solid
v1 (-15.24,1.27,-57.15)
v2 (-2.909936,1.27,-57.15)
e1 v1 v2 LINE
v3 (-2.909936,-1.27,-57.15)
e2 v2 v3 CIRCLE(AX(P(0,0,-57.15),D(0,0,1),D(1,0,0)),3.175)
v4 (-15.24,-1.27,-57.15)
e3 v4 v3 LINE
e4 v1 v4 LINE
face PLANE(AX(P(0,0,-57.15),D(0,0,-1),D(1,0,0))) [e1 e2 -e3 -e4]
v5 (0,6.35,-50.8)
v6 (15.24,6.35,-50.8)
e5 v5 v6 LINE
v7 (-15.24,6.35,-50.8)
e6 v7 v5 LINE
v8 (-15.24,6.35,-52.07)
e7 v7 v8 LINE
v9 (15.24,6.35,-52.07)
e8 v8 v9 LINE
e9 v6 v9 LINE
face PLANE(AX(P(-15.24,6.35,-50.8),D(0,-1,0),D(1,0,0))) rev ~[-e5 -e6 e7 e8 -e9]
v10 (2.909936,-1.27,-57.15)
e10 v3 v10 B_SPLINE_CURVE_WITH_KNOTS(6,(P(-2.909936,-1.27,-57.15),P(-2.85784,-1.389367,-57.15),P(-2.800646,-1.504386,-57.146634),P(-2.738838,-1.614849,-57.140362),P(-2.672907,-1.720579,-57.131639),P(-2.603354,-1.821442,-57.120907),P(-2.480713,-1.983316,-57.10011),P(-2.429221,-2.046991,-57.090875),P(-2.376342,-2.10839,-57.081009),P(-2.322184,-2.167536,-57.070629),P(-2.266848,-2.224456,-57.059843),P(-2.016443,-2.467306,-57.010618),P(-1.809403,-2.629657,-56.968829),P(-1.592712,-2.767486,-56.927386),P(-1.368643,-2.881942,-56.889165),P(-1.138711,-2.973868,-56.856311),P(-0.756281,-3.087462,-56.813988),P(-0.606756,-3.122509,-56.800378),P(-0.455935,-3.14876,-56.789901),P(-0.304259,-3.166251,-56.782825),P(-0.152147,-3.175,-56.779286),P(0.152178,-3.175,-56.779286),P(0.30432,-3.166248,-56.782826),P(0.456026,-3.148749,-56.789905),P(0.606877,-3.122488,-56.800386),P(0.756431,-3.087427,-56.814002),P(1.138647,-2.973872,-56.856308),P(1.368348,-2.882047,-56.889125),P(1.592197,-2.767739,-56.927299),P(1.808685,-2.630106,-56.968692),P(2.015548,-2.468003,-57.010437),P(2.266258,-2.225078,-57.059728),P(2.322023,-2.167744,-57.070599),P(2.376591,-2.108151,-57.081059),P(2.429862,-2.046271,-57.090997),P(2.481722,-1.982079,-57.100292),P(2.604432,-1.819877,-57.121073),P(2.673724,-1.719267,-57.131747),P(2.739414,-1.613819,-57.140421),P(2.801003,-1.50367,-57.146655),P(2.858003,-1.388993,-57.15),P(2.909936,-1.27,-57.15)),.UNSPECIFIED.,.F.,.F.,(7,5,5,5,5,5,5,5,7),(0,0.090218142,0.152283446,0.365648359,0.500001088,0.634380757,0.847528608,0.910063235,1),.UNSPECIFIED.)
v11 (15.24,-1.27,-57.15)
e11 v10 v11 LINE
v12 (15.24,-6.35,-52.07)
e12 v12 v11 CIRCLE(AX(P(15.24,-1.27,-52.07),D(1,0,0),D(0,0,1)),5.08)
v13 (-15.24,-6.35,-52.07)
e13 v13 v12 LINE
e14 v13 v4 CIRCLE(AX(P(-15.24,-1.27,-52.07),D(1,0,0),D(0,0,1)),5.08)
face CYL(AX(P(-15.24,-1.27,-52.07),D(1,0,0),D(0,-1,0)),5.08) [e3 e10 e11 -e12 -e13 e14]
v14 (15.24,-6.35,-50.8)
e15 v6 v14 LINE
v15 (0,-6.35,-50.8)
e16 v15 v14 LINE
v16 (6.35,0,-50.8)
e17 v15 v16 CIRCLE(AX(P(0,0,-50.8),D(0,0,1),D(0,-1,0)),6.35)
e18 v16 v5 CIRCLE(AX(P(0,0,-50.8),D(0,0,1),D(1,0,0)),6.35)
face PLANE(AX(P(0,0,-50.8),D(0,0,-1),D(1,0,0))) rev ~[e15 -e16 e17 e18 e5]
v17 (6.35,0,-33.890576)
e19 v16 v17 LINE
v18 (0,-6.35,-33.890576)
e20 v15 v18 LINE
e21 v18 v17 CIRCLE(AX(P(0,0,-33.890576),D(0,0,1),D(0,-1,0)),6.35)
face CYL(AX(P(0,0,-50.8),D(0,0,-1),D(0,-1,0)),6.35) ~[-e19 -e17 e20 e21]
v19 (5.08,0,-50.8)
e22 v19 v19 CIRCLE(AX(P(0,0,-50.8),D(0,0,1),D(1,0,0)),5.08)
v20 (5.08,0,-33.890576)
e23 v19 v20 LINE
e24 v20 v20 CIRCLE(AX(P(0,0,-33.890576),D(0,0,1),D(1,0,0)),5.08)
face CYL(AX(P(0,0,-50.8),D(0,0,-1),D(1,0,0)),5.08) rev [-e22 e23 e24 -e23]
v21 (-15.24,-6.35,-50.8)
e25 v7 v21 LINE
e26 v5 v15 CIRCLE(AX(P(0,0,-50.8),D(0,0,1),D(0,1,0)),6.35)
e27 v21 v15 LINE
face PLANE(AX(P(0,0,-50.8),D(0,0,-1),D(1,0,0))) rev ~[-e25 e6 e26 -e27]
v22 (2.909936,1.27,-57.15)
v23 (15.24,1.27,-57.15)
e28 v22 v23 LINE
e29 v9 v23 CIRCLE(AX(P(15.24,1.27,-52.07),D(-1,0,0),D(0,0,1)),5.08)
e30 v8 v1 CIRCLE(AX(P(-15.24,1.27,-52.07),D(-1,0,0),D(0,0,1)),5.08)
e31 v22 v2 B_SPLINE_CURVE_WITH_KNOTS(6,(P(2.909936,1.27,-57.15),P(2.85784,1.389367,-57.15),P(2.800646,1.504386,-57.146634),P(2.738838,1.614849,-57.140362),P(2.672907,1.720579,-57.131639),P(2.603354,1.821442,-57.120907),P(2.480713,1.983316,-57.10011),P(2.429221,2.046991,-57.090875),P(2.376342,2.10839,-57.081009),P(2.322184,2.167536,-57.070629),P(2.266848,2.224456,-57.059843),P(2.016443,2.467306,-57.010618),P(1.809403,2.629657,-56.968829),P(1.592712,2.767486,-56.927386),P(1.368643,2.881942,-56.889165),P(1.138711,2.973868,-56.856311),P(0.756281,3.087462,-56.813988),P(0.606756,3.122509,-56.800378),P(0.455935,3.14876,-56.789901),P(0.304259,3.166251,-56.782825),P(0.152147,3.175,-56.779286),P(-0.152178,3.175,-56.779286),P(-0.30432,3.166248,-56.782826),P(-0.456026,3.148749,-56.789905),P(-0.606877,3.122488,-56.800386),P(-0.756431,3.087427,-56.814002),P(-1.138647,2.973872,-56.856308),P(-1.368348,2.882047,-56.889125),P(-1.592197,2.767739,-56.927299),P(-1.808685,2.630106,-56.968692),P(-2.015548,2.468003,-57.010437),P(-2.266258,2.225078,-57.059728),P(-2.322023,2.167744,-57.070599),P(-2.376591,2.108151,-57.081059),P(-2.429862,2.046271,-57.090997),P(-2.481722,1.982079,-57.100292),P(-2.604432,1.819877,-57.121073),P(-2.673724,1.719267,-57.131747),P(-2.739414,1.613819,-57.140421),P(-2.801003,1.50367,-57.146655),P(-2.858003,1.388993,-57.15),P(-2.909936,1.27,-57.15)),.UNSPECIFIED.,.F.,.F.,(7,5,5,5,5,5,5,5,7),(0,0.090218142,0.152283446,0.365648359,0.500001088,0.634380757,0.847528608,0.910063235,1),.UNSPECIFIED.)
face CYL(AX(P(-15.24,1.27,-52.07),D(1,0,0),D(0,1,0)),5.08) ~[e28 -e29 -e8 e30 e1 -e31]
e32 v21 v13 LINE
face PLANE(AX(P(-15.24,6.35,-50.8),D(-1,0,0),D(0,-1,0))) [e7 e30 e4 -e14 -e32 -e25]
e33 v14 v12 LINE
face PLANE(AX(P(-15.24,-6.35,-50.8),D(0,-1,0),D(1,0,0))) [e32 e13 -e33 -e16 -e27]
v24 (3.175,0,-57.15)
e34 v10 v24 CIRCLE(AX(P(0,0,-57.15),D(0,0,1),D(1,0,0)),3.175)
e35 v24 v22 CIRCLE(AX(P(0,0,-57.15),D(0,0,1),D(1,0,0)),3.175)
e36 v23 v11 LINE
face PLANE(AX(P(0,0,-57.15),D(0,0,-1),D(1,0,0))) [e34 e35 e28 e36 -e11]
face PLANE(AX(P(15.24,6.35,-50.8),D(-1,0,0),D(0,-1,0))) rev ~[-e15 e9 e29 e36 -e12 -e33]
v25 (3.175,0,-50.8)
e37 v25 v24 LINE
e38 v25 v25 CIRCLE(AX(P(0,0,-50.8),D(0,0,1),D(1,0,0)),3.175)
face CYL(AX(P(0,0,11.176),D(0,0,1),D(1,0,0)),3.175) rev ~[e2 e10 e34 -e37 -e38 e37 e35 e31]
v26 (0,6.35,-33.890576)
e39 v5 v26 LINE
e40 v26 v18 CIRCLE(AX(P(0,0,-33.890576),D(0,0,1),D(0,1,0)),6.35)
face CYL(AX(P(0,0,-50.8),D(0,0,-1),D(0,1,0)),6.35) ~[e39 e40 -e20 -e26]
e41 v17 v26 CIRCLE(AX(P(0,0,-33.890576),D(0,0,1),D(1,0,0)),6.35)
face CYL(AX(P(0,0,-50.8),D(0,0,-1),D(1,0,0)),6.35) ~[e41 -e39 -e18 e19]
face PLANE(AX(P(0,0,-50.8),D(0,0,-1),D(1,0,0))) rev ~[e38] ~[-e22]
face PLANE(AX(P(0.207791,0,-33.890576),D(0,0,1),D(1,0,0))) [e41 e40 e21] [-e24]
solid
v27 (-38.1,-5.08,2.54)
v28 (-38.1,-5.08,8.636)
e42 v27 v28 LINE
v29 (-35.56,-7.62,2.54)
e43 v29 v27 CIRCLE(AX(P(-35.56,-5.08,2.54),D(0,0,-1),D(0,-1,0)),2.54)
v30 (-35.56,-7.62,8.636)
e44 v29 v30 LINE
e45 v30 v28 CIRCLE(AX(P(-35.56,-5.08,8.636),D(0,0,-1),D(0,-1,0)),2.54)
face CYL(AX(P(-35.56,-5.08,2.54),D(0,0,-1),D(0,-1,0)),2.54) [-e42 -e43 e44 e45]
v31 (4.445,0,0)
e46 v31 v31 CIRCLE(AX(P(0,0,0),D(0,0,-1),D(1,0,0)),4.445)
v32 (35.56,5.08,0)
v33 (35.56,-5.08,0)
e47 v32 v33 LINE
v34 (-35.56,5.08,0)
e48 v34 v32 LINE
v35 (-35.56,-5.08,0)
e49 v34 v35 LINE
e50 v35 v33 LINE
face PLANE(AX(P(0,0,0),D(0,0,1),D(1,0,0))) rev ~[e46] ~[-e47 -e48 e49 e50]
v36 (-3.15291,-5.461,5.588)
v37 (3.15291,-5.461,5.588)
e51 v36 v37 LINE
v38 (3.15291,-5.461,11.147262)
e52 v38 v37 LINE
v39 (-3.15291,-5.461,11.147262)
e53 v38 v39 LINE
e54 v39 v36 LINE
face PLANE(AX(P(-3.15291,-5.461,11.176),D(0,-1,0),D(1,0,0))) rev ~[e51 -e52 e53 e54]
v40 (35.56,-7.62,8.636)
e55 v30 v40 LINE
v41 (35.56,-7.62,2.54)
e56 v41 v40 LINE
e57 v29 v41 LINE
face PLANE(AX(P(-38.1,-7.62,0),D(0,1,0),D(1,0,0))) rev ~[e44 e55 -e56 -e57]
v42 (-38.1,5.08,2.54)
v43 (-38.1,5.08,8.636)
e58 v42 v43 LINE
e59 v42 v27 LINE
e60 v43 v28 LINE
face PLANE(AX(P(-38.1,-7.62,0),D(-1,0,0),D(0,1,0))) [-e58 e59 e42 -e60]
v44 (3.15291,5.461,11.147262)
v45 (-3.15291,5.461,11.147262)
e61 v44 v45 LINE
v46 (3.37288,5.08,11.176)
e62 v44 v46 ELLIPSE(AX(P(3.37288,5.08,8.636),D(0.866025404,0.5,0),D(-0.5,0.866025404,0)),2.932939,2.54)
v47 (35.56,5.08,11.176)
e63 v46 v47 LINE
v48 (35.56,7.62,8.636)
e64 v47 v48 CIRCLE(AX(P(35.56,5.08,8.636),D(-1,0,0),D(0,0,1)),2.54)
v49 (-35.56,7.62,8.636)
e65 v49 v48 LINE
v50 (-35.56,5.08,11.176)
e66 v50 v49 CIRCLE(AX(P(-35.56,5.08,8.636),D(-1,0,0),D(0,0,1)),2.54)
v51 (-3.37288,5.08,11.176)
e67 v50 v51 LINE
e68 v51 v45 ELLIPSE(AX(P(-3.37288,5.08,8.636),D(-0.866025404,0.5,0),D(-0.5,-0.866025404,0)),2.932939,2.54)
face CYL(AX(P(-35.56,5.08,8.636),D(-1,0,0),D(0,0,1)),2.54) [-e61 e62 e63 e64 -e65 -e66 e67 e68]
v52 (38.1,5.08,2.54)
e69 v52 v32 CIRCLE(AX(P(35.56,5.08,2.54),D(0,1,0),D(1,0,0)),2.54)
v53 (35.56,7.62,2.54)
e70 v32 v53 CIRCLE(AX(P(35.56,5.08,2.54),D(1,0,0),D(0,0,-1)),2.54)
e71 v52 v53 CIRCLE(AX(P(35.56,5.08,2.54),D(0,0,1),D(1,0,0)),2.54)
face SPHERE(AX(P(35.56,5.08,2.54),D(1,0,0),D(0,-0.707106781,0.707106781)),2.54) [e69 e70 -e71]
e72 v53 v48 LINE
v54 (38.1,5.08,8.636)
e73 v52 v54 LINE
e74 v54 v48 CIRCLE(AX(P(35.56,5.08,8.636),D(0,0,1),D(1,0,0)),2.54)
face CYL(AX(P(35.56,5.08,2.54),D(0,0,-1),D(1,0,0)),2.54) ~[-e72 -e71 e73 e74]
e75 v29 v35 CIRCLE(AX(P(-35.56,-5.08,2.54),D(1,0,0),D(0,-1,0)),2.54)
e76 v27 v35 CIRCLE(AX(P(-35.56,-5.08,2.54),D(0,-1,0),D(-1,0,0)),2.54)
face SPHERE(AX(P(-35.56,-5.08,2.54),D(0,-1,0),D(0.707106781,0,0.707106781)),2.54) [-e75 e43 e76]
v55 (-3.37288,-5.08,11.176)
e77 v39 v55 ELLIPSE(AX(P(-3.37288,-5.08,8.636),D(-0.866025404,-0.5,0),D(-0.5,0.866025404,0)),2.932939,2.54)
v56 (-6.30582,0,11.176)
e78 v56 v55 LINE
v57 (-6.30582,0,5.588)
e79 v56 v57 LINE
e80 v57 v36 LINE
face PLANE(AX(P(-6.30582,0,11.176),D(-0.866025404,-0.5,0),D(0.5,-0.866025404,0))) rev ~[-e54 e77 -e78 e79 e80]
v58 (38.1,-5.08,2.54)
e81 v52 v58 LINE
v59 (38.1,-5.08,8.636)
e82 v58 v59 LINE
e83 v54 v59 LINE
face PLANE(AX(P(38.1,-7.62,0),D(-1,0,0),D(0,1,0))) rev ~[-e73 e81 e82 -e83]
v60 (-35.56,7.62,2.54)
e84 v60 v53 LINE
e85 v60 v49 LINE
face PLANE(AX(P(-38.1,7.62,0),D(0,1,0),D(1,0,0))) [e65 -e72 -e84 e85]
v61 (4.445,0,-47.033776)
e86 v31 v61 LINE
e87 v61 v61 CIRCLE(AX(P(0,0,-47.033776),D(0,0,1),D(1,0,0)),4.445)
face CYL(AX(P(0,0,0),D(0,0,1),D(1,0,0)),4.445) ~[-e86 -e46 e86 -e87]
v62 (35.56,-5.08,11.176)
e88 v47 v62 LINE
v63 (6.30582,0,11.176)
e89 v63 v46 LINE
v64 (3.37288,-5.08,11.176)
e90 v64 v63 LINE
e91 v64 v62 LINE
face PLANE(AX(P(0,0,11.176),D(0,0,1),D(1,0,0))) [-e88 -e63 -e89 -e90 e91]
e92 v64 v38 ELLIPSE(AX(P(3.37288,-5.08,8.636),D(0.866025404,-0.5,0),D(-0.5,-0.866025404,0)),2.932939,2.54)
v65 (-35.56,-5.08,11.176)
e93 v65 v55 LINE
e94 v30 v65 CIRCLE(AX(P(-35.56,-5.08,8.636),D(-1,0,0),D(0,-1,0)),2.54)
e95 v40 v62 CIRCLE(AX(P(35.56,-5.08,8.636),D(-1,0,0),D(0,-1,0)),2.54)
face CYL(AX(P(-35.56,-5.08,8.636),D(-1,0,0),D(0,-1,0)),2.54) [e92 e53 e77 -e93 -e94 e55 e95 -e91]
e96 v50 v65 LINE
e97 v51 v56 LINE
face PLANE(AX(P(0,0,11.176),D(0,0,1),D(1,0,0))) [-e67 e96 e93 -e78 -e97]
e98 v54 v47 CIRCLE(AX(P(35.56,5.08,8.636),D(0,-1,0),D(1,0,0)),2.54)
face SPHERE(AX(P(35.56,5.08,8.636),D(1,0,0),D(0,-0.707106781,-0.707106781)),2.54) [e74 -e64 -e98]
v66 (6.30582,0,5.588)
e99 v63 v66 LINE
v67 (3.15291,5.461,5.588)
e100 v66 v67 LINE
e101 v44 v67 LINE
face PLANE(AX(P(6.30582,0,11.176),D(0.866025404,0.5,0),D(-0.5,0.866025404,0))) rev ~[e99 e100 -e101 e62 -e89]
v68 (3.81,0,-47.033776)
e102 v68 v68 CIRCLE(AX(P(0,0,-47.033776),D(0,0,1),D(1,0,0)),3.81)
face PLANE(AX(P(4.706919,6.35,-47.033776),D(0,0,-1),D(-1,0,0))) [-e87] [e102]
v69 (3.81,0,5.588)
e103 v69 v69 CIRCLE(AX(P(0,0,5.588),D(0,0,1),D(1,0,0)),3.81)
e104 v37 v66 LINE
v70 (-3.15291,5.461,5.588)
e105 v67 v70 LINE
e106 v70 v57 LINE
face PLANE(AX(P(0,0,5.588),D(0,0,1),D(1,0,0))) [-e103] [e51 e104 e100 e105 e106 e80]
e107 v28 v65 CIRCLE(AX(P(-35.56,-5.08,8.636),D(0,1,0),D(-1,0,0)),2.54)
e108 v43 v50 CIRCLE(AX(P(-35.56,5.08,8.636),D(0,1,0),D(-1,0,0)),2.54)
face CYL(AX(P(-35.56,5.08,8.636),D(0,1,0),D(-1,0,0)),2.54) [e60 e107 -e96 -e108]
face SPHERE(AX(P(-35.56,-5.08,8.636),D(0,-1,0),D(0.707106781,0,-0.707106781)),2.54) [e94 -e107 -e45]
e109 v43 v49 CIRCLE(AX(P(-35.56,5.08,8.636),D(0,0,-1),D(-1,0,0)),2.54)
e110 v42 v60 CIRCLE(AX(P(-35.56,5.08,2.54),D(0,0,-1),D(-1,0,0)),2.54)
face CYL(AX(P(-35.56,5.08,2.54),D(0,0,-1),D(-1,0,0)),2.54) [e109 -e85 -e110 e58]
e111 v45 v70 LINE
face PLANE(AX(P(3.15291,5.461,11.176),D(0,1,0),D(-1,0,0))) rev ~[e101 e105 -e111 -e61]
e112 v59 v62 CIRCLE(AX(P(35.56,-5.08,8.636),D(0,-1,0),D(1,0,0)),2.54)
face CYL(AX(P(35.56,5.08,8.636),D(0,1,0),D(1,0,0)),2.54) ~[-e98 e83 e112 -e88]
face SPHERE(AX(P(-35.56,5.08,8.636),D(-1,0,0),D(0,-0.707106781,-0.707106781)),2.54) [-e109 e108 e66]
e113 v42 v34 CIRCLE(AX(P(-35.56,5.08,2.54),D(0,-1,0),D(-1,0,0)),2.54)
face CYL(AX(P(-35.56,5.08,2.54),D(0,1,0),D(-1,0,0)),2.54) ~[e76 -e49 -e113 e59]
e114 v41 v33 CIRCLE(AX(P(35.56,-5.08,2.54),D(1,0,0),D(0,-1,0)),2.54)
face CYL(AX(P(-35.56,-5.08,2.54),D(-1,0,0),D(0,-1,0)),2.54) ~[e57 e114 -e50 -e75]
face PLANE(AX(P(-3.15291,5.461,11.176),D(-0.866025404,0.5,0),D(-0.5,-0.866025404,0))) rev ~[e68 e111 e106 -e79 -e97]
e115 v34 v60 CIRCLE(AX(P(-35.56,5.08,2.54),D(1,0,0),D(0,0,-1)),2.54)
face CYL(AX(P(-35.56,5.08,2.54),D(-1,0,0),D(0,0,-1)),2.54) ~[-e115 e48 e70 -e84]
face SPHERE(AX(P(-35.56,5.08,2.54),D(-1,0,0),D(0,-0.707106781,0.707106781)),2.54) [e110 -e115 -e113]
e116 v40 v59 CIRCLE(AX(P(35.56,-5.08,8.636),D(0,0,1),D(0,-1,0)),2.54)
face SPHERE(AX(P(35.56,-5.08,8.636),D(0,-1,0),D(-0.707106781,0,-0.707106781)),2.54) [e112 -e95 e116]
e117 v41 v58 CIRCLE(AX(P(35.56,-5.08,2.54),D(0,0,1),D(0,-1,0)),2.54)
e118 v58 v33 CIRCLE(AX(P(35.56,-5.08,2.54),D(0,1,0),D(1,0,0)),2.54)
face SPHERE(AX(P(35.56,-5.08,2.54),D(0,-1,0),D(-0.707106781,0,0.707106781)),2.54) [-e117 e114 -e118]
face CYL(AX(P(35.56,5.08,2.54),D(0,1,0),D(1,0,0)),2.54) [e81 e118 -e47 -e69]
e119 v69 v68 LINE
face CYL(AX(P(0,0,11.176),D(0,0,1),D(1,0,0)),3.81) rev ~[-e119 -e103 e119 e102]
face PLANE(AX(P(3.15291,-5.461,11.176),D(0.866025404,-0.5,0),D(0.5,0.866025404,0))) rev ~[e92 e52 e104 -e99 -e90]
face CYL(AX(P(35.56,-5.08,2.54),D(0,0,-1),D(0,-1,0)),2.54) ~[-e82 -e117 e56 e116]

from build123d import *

# Parameters (mm, degrees)
F0_W         = 76.2
F0_H         = 15.24
F1_DEPTH     = 11.176
F4_DEPTH     = 5.588
F5_R         = 3.175
F6_DEPTH     = 11.176
F7_T1_DEPTH  = 6.096
F7_T3_DEPTH  = 10.16
F7_T5_DEPTH  = 71.12
F7_S9_W      = 2.54
F7_S9_H      = 2.54
F7_T10_DEPTH = 2.54
F7_S15_W     = 2.54
F7_S15_H     = 2.54
F7_T16_DEPTH = 2.54
F7_S21_W     = 2.54
F7_S21_H     = 2.54
F7_T22_DEPTH = 2.54
F7_S27_W     = 2.54
F7_S27_H     = 2.54
F7_T28_DEPTH = 2.54
F7_S33_W     = 2.54
F7_S33_H     = 2.54
F7_T34_DEPTH = 2.54
F7_S39_W     = 2.54
F7_S39_H     = 2.54
F7_T40_DEPTH = 2.54
F7_S45_W     = 2.54
F7_S45_H     = 2.54
F7_T46_DEPTH = 2.54
F7_S51_W     = 2.54
F7_S51_H     = 2.54
F7_T52_DEPTH = 2.54
F8_R         = 4.445
F9_DEPTH     = 50.8
F10_R        = 3.175
F11_DEPTH    = 61.976
F12_W        = 30.48
F12_H        = 12.7
F13_DEPTH    = 6.35
F14_R        = 5.08
F15_R        = 3.175
F16_DEPTH    = 71.6058239341
F17_W        = 9.715013206
F17_H        = 3.7662244022
F18_DEPTH    = 16.9285498559
F20_R        = 5.08
F21_DEPTH    = 16.9094242156
F22_R        = 3.81
F23_DEPTH    = 111.593618989


# Not quite as in the source:
# - a fillet or chamfer that OpenCascade refuses, or shapes differently, is made with other operations: its cross-section is extruded or revolved along the edge and cut away or added


with BuildPart() as f1:
    # F0 (on Top) → F1 (new body)
    with BuildSketch(Plane.XY):
        Rectangle(F0_W, F0_H)
    extrude(amount=F1_DEPTH)

    # F3 (on face) → F4 (cut)
    with BuildSketch(Plane.XY.offset(11.176)):
        Polygon((-3.15290982, -5.461), (3.15290982, -5.461), (6.3058196401, 0), (3.15290982, 5.461), (-3.15290982, 5.461), (-6.3058196401, 0), align=None)
    extrude(amount=-F4_DEPTH, mode=Mode.SUBTRACT)

    # F5 (on face) → F6 (cut)
    with BuildSketch(Plane.XY.offset(11.176)):
        Circle(F5_R)
    extrude(amount=-F6_DEPTH, mode=Mode.SUBTRACT)

    # F7: fillet of radius 2.54 on 12 edges, made by hand

    # F7_s2 → F7_t1 (cut)
    with BuildSketch(Plane.XY.offset(2.54)):
        with BuildLine():
            ThreePointArc((-35.56, -7.62), (-37.3560512242, -6.8760512242), (-38.1, -5.08))
            Line((-38.1, -5.08), (-38.1, -7.62))
            Line((-38.1, -7.62), (-35.56, -7.62))
        make_face()
        with BuildLine():
            ThreePointArc((-38.1, 5.08), (-37.3560512242, 6.8760512242), (-35.56, 7.62))
            Line((-35.56, 7.62), (-38.1, 7.62))
            Line((-38.1, 7.62), (-38.1, 5.08))
        make_face()
        with BuildLine():
            ThreePointArc((38.1, 5.08), (37.3560512242, 6.8760512242), (35.56, 7.62))
            Line((35.56, 7.62), (38.1, 7.62))
            Line((38.1, 7.62), (38.1, 5.08))
        make_face()
        with BuildLine():
            ThreePointArc((35.56, -7.62), (37.3560512242, -6.8760512242), (38.1, -5.08))
            Line((38.1, -5.08), (38.1, -7.62))
            Line((38.1, -7.62), (35.56, -7.62))
        make_face()
    extrude(amount=F7_T1_DEPTH, mode=Mode.SUBTRACT)

    # F7_s4 → F7_t3 (cut)
    with BuildSketch(Plane.XZ.offset(-5.08)):
        with BuildLine():
            ThreePointArc((38.1, 2.54), (37.3560512242, 0.7439487758), (35.56, 0))
            Line((35.56, 0), (38.1, 0))
            Line((38.1, 0), (38.1, 2.54))
        make_face()
        with BuildLine():
            ThreePointArc((-38.1, 8.636), (-37.3560512242, 10.4320512242), (-35.56, 11.176))
            Line((-35.56, 11.176), (-38.1, 11.176))
            Line((-38.1, 11.176), (-38.1, 8.636))
        make_face()
        with BuildLine():
            ThreePointArc((-38.1, 2.54), (-37.3560512242, 0.7439487758), (-35.56, 0))
            Line((-35.56, 0), (-38.1, 0))
            Line((-38.1, 0), (-38.1, 2.54))
        make_face()
        with BuildLine():
            ThreePointArc((38.1, 8.636), (37.3560512242, 10.4320512242), (35.56, 11.176))
            Line((35.56, 11.176), (38.1, 11.176))
            Line((38.1, 11.176), (38.1, 8.636))
        make_face()
    extrude(amount=F7_T3_DEPTH, mode=Mode.SUBTRACT)

    # F7_s6 → F7_t5 (cut)
    with BuildSketch(Plane.YZ.offset(-35.56)):
        with BuildLine():
            ThreePointArc((5.08, 11.176), (6.8760512242, 10.4320512242), (7.62, 8.636))
            Line((7.62, 8.636), (7.62, 11.176))
            Line((7.62, 11.176), (5.08, 11.176))
        make_face()
        with BuildLine():
            ThreePointArc((5.08, 0), (6.8760512242, 0.7439487758), (7.62, 2.54))
            Line((7.62, 2.54), (7.62, 0))
            Line((7.62, 0), (5.08, 0))
        make_face()
        with BuildLine():
            ThreePointArc((-7.62, 2.54), (-6.8760512242, 0.7439487758), (-5.08, 0))
            Line((-5.08, 0), (-7.62, 0))
            Line((-7.62, 0), (-7.62, 2.54))
        make_face()
        with BuildLine():
            ThreePointArc((-7.62, 8.636), (-6.8760512242, 10.4320512242), (-5.08, 11.176))
            Line((-5.08, 11.176), (-7.62, 11.176))
            Line((-7.62, 11.176), (-7.62, 8.636))
        make_face()
    extrude(amount=F7_T5_DEPTH, mode=Mode.SUBTRACT)


with BuildPart() as f7_tool8:
    # F7_s9 → F7_t10 (new body)
    with BuildSketch(Plane.XZ.offset(5.08)):
        with Locations((-36.83, 1.27)):
            Rectangle(F7_S9_W, F7_S9_H)
    extrude(amount=F7_T10_DEPTH)

    # F7_s11 → F7_t12 (revolve, cut)
    with BuildSketch(Plane(origin=(-35.56, -5.08, 2.54), x_dir=(0.7071067812, 0, 0.7071067812), z_dir=(0.7071067812, 0, -0.7071067812))):
        with BuildLine():
            ThreePointArc((0, -2.54), (2.54, 0), (0, 2.54))
            Line((0, 2.54), (0, -2.54))
        make_face()
    revolve(axis=Axis((-35.56, -5.08, 2.54), (0, -1, 0)), mode=Mode.SUBTRACT)


with BuildPart() as f1_1:
    add(f1.part)

    # F7_t7: cut F7_tool8
    add(f7_tool8.part, mode=Mode.SUBTRACT)


with BuildPart() as f7_tool14:
    # F7_s15 → F7_t16 (new body)
    with BuildSketch(Plane.XZ.offset(5.08)):
        with Locations((-36.83, 9.906)):
            Rectangle(F7_S15_W, F7_S15_H)
    extrude(amount=F7_T16_DEPTH)

    # F7_s17 → F7_t18 (revolve, cut)
    with BuildSketch(Plane(origin=(-35.56, -5.08, 8.636), x_dir=(0.7071067812, 0, -0.7071067812), z_dir=(-0.7071067812, 0, -0.7071067812))):
        with BuildLine():
            ThreePointArc((0, -2.54), (2.54, 0), (0, 2.54))
            Line((0, 2.54), (0, -2.54))
        make_face()
    revolve(axis=Axis((-35.56, -5.08, 8.636), (0, -1, 0)), mode=Mode.SUBTRACT)


with BuildPart() as f1_2:
    add(f1_1.part)

    # F7_t13: cut F7_tool14
    add(f7_tool14.part, mode=Mode.SUBTRACT)


with BuildPart() as f7_tool20:
    # F7_s21 → F7_t22 (new body)
    with BuildSketch(Plane.YZ.offset(-35.56)):
        with Locations((6.35, 1.27)):
            Rectangle(F7_S21_W, F7_S21_H)
    extrude(amount=-F7_T22_DEPTH)

    # F7_s23 → F7_t24 (revolve, cut)
    with BuildSketch(Plane(origin=(-35.56, 5.08, 2.54), x_dir=(0, -0.7071067812, 0.7071067812), z_dir=(0, -0.7071067812, -0.7071067812))):
        with BuildLine():
            ThreePointArc((0, -2.54), (2.54, 0), (0, 2.54))
            Line((0, 2.54), (0, -2.54))
        make_face()
    revolve(axis=Axis((-35.56, 5.08, 2.54), (-1, 0, 0)), mode=Mode.SUBTRACT)


with BuildPart() as f1_3:
    add(f1_2.part)

    # F7_t19: cut F7_tool20
    add(f7_tool20.part, mode=Mode.SUBTRACT)


with BuildPart() as f7_tool26:
    # F7_s27 → F7_t28 (new body)
    with BuildSketch(Plane.YZ.offset(-35.56)):
        with Locations((6.35, 9.906)):
            Rectangle(F7_S27_W, F7_S27_H)
    extrude(amount=-F7_T28_DEPTH)

    # F7_s29 → F7_t30 (revolve, cut)
    with BuildSketch(Plane(origin=(-35.56, 5.08, 8.636), x_dir=(0, -0.7071067812, -0.7071067812), z_dir=(0, 0.7071067812, -0.7071067812))):
        with BuildLine():
            ThreePointArc((0, -2.54), (2.54, 0), (0, 2.54))
            Line((0, 2.54), (0, -2.54))
        make_face()
    revolve(axis=Axis((-35.56, 5.08, 8.636), (-1, 0, 0)), mode=Mode.SUBTRACT)


with BuildPart() as f1_4:
    add(f1_3.part)

    # F7_t25: cut F7_tool26
    add(f7_tool26.part, mode=Mode.SUBTRACT)


with BuildPart() as f7_tool32:
    # F7_s33 → F7_t34 (new body)
    with BuildSketch(Plane.XZ.offset(5.08)):
        with Locations((36.83, 1.27)):
            Rectangle(F7_S33_W, F7_S33_H)
    extrude(amount=F7_T34_DEPTH)

    # F7_s35 → F7_t36 (revolve, cut)
    with BuildSketch(Plane(origin=(35.56, -5.08, 2.54), x_dir=(-0.7071067812, 0, 0.7071067812), z_dir=(0.7071067812, 0, 0.7071067812))):
        with BuildLine():
            ThreePointArc((0, -2.54), (2.54, 0), (0, 2.54))
            Line((0, 2.54), (0, -2.54))
        make_face()
    revolve(axis=Axis((35.56, -5.08, 2.54), (0, -1, 0)), mode=Mode.SUBTRACT)


with BuildPart() as f1_5:
    add(f1_4.part)

    # F7_t31: cut F7_tool32
    add(f7_tool32.part, mode=Mode.SUBTRACT)


with BuildPart() as f7_tool38:
    # F7_s39 → F7_t40 (new body)
    with BuildSketch(Plane.YZ.offset(35.56)):
        with Locations((6.35, 1.27)):
            Rectangle(F7_S39_W, F7_S39_H)
    extrude(amount=F7_T40_DEPTH)

    # F7_s41 → F7_t42 (revolve, cut)
    with BuildSketch(Plane(origin=(35.56, 5.08, 2.54), x_dir=(0, -0.7071067812, 0.7071067812), z_dir=(0, 0.7071067812, 0.7071067812))):
        with BuildLine():
            ThreePointArc((0, -2.54), (2.54, 0), (0, 2.54))
            Line((0, 2.54), (0, -2.54))
        make_face()
    revolve(axis=Axis((35.56, 5.08, 2.54), (1, 0, 0)), mode=Mode.SUBTRACT)


with BuildPart() as f1_6:
    add(f1_5.part)

    # F7_t37: cut F7_tool38
    add(f7_tool38.part, mode=Mode.SUBTRACT)


with BuildPart() as f7_tool44:
    # F7_s45 → F7_t46 (new body)
    with BuildSketch(Plane.YZ.offset(35.56)):
        with Locations((6.35, 9.906)):
            Rectangle(F7_S45_W, F7_S45_H)
    extrude(amount=F7_T46_DEPTH)

    # F7_s47 → F7_t48 (revolve, cut)
    with BuildSketch(Plane(origin=(35.56, 5.08, 8.636), x_dir=(0, -0.7071067812, -0.7071067812), z_dir=(0, -0.7071067812, 0.7071067812))):
        with BuildLine():
            ThreePointArc((0, -2.54), (2.54, 0), (0, 2.54))
            Line((0, 2.54), (0, -2.54))
        make_face()
    revolve(axis=Axis((35.56, 5.08, 8.636), (1, 0, 0)), mode=Mode.SUBTRACT)


with BuildPart() as f1_7:
    add(f1_6.part)

    # F7_t43: cut F7_tool44
    add(f7_tool44.part, mode=Mode.SUBTRACT)


with BuildPart() as f7_tool50:
    # F7_s51 → F7_t52 (new body)
    with BuildSketch(Plane.XZ.offset(5.08)):
        with Locations((36.83, 9.906)):
            Rectangle(F7_S51_W, F7_S51_H)
    extrude(amount=F7_T52_DEPTH)

    # F7_s53 → F7_t54 (revolve, cut)
    with BuildSketch(Plane(origin=(35.56, -5.08, 8.636), x_dir=(-0.7071067812, 0, -0.7071067812), z_dir=(-0.7071067812, 0, 0.7071067812))):
        with BuildLine():
            ThreePointArc((0, -2.54), (2.54, 0), (0, 2.54))
            Line((0, 2.54), (0, -2.54))
        make_face()
    revolve(axis=Axis((35.56, -5.08, 8.636), (0, -1, 0)), mode=Mode.SUBTRACT)


with BuildPart() as f1_8:
    add(f1_7.part)

    # F7_t49: cut F7_tool50
    add(f7_tool50.part, mode=Mode.SUBTRACT)

    # F8 (on face) → F9 (join)
    with BuildSketch(Plane(origin=(0, 0, 0), x_dir=(1, 0, 0), z_dir=(0, 0, -1))):
        Circle(F8_R)
    extrude(amount=F9_DEPTH)

    # F10 (on face) → F11 (cut)
    with BuildSketch(Plane.XY.offset(11.176)):
        Circle(F10_R)
    extrude(amount=-F11_DEPTH, mode=Mode.SUBTRACT)

    # F17 (on face) → F18 (cut)
    with BuildSketch(Plane(origin=(0, 6.35, 0), x_dir=(-1, 0, 0), z_dir=(0, 1, 0))):
        with Locations((0.1505874097, -48.9168877989)):
            Rectangle(F17_W, F17_H)
    extrude(amount=-F18_DEPTH, mode=Mode.SUBTRACT)

    # F22 (on face) → F23 (cut)
    with BuildSketch(Plane.XY.offset(11.176)):
        Circle(F22_R)
    extrude(amount=-F23_DEPTH, mode=Mode.SUBTRACT)


with BuildPart() as f13:
    # F12 (on face) → F13 (new body)
    with BuildSketch(Plane(origin=(0, 0, -50.8), x_dir=(1, 0, 0), z_dir=(0, 0, -1))):
        Rectangle(F12_W, F12_H)
    extrude(amount=F13_DEPTH)

    # F14
    f14_edges = [f13.edges().sort_by_distance(p)[0] for p in [
        (0, -6.35, -57.15),
        (0, 6.35, -57.15),
    ]]
    fillet(f14_edges, radius=F14_R)

    # F15 (on face) → F16 (cut)
    with BuildSketch(Plane.XY.offset(11.176)):
        Circle(F15_R)
    extrude(amount=-F16_DEPTH, mode=Mode.SUBTRACT)

    # F20 (on face) → F21 (join)
    with BuildSketch(Plane.XY.offset(-50.8)):
        with BuildLine():
            ThreePointArc((0, -6.35), (4.4901280605, -4.4901280605), (6.35, 0))
            ThreePointArc((6.35, 0), (4.4901280605, 4.4901280605), (0, 6.35))
            ThreePointArc((0, 6.35), (-6.35, 0), (0, -6.35))
        make_face()
        Circle(F20_R, mode=Mode.SUBTRACT)
    extrude(amount=F21_DEPTH)


solid = Compound([f1_8.part, f13.part])
